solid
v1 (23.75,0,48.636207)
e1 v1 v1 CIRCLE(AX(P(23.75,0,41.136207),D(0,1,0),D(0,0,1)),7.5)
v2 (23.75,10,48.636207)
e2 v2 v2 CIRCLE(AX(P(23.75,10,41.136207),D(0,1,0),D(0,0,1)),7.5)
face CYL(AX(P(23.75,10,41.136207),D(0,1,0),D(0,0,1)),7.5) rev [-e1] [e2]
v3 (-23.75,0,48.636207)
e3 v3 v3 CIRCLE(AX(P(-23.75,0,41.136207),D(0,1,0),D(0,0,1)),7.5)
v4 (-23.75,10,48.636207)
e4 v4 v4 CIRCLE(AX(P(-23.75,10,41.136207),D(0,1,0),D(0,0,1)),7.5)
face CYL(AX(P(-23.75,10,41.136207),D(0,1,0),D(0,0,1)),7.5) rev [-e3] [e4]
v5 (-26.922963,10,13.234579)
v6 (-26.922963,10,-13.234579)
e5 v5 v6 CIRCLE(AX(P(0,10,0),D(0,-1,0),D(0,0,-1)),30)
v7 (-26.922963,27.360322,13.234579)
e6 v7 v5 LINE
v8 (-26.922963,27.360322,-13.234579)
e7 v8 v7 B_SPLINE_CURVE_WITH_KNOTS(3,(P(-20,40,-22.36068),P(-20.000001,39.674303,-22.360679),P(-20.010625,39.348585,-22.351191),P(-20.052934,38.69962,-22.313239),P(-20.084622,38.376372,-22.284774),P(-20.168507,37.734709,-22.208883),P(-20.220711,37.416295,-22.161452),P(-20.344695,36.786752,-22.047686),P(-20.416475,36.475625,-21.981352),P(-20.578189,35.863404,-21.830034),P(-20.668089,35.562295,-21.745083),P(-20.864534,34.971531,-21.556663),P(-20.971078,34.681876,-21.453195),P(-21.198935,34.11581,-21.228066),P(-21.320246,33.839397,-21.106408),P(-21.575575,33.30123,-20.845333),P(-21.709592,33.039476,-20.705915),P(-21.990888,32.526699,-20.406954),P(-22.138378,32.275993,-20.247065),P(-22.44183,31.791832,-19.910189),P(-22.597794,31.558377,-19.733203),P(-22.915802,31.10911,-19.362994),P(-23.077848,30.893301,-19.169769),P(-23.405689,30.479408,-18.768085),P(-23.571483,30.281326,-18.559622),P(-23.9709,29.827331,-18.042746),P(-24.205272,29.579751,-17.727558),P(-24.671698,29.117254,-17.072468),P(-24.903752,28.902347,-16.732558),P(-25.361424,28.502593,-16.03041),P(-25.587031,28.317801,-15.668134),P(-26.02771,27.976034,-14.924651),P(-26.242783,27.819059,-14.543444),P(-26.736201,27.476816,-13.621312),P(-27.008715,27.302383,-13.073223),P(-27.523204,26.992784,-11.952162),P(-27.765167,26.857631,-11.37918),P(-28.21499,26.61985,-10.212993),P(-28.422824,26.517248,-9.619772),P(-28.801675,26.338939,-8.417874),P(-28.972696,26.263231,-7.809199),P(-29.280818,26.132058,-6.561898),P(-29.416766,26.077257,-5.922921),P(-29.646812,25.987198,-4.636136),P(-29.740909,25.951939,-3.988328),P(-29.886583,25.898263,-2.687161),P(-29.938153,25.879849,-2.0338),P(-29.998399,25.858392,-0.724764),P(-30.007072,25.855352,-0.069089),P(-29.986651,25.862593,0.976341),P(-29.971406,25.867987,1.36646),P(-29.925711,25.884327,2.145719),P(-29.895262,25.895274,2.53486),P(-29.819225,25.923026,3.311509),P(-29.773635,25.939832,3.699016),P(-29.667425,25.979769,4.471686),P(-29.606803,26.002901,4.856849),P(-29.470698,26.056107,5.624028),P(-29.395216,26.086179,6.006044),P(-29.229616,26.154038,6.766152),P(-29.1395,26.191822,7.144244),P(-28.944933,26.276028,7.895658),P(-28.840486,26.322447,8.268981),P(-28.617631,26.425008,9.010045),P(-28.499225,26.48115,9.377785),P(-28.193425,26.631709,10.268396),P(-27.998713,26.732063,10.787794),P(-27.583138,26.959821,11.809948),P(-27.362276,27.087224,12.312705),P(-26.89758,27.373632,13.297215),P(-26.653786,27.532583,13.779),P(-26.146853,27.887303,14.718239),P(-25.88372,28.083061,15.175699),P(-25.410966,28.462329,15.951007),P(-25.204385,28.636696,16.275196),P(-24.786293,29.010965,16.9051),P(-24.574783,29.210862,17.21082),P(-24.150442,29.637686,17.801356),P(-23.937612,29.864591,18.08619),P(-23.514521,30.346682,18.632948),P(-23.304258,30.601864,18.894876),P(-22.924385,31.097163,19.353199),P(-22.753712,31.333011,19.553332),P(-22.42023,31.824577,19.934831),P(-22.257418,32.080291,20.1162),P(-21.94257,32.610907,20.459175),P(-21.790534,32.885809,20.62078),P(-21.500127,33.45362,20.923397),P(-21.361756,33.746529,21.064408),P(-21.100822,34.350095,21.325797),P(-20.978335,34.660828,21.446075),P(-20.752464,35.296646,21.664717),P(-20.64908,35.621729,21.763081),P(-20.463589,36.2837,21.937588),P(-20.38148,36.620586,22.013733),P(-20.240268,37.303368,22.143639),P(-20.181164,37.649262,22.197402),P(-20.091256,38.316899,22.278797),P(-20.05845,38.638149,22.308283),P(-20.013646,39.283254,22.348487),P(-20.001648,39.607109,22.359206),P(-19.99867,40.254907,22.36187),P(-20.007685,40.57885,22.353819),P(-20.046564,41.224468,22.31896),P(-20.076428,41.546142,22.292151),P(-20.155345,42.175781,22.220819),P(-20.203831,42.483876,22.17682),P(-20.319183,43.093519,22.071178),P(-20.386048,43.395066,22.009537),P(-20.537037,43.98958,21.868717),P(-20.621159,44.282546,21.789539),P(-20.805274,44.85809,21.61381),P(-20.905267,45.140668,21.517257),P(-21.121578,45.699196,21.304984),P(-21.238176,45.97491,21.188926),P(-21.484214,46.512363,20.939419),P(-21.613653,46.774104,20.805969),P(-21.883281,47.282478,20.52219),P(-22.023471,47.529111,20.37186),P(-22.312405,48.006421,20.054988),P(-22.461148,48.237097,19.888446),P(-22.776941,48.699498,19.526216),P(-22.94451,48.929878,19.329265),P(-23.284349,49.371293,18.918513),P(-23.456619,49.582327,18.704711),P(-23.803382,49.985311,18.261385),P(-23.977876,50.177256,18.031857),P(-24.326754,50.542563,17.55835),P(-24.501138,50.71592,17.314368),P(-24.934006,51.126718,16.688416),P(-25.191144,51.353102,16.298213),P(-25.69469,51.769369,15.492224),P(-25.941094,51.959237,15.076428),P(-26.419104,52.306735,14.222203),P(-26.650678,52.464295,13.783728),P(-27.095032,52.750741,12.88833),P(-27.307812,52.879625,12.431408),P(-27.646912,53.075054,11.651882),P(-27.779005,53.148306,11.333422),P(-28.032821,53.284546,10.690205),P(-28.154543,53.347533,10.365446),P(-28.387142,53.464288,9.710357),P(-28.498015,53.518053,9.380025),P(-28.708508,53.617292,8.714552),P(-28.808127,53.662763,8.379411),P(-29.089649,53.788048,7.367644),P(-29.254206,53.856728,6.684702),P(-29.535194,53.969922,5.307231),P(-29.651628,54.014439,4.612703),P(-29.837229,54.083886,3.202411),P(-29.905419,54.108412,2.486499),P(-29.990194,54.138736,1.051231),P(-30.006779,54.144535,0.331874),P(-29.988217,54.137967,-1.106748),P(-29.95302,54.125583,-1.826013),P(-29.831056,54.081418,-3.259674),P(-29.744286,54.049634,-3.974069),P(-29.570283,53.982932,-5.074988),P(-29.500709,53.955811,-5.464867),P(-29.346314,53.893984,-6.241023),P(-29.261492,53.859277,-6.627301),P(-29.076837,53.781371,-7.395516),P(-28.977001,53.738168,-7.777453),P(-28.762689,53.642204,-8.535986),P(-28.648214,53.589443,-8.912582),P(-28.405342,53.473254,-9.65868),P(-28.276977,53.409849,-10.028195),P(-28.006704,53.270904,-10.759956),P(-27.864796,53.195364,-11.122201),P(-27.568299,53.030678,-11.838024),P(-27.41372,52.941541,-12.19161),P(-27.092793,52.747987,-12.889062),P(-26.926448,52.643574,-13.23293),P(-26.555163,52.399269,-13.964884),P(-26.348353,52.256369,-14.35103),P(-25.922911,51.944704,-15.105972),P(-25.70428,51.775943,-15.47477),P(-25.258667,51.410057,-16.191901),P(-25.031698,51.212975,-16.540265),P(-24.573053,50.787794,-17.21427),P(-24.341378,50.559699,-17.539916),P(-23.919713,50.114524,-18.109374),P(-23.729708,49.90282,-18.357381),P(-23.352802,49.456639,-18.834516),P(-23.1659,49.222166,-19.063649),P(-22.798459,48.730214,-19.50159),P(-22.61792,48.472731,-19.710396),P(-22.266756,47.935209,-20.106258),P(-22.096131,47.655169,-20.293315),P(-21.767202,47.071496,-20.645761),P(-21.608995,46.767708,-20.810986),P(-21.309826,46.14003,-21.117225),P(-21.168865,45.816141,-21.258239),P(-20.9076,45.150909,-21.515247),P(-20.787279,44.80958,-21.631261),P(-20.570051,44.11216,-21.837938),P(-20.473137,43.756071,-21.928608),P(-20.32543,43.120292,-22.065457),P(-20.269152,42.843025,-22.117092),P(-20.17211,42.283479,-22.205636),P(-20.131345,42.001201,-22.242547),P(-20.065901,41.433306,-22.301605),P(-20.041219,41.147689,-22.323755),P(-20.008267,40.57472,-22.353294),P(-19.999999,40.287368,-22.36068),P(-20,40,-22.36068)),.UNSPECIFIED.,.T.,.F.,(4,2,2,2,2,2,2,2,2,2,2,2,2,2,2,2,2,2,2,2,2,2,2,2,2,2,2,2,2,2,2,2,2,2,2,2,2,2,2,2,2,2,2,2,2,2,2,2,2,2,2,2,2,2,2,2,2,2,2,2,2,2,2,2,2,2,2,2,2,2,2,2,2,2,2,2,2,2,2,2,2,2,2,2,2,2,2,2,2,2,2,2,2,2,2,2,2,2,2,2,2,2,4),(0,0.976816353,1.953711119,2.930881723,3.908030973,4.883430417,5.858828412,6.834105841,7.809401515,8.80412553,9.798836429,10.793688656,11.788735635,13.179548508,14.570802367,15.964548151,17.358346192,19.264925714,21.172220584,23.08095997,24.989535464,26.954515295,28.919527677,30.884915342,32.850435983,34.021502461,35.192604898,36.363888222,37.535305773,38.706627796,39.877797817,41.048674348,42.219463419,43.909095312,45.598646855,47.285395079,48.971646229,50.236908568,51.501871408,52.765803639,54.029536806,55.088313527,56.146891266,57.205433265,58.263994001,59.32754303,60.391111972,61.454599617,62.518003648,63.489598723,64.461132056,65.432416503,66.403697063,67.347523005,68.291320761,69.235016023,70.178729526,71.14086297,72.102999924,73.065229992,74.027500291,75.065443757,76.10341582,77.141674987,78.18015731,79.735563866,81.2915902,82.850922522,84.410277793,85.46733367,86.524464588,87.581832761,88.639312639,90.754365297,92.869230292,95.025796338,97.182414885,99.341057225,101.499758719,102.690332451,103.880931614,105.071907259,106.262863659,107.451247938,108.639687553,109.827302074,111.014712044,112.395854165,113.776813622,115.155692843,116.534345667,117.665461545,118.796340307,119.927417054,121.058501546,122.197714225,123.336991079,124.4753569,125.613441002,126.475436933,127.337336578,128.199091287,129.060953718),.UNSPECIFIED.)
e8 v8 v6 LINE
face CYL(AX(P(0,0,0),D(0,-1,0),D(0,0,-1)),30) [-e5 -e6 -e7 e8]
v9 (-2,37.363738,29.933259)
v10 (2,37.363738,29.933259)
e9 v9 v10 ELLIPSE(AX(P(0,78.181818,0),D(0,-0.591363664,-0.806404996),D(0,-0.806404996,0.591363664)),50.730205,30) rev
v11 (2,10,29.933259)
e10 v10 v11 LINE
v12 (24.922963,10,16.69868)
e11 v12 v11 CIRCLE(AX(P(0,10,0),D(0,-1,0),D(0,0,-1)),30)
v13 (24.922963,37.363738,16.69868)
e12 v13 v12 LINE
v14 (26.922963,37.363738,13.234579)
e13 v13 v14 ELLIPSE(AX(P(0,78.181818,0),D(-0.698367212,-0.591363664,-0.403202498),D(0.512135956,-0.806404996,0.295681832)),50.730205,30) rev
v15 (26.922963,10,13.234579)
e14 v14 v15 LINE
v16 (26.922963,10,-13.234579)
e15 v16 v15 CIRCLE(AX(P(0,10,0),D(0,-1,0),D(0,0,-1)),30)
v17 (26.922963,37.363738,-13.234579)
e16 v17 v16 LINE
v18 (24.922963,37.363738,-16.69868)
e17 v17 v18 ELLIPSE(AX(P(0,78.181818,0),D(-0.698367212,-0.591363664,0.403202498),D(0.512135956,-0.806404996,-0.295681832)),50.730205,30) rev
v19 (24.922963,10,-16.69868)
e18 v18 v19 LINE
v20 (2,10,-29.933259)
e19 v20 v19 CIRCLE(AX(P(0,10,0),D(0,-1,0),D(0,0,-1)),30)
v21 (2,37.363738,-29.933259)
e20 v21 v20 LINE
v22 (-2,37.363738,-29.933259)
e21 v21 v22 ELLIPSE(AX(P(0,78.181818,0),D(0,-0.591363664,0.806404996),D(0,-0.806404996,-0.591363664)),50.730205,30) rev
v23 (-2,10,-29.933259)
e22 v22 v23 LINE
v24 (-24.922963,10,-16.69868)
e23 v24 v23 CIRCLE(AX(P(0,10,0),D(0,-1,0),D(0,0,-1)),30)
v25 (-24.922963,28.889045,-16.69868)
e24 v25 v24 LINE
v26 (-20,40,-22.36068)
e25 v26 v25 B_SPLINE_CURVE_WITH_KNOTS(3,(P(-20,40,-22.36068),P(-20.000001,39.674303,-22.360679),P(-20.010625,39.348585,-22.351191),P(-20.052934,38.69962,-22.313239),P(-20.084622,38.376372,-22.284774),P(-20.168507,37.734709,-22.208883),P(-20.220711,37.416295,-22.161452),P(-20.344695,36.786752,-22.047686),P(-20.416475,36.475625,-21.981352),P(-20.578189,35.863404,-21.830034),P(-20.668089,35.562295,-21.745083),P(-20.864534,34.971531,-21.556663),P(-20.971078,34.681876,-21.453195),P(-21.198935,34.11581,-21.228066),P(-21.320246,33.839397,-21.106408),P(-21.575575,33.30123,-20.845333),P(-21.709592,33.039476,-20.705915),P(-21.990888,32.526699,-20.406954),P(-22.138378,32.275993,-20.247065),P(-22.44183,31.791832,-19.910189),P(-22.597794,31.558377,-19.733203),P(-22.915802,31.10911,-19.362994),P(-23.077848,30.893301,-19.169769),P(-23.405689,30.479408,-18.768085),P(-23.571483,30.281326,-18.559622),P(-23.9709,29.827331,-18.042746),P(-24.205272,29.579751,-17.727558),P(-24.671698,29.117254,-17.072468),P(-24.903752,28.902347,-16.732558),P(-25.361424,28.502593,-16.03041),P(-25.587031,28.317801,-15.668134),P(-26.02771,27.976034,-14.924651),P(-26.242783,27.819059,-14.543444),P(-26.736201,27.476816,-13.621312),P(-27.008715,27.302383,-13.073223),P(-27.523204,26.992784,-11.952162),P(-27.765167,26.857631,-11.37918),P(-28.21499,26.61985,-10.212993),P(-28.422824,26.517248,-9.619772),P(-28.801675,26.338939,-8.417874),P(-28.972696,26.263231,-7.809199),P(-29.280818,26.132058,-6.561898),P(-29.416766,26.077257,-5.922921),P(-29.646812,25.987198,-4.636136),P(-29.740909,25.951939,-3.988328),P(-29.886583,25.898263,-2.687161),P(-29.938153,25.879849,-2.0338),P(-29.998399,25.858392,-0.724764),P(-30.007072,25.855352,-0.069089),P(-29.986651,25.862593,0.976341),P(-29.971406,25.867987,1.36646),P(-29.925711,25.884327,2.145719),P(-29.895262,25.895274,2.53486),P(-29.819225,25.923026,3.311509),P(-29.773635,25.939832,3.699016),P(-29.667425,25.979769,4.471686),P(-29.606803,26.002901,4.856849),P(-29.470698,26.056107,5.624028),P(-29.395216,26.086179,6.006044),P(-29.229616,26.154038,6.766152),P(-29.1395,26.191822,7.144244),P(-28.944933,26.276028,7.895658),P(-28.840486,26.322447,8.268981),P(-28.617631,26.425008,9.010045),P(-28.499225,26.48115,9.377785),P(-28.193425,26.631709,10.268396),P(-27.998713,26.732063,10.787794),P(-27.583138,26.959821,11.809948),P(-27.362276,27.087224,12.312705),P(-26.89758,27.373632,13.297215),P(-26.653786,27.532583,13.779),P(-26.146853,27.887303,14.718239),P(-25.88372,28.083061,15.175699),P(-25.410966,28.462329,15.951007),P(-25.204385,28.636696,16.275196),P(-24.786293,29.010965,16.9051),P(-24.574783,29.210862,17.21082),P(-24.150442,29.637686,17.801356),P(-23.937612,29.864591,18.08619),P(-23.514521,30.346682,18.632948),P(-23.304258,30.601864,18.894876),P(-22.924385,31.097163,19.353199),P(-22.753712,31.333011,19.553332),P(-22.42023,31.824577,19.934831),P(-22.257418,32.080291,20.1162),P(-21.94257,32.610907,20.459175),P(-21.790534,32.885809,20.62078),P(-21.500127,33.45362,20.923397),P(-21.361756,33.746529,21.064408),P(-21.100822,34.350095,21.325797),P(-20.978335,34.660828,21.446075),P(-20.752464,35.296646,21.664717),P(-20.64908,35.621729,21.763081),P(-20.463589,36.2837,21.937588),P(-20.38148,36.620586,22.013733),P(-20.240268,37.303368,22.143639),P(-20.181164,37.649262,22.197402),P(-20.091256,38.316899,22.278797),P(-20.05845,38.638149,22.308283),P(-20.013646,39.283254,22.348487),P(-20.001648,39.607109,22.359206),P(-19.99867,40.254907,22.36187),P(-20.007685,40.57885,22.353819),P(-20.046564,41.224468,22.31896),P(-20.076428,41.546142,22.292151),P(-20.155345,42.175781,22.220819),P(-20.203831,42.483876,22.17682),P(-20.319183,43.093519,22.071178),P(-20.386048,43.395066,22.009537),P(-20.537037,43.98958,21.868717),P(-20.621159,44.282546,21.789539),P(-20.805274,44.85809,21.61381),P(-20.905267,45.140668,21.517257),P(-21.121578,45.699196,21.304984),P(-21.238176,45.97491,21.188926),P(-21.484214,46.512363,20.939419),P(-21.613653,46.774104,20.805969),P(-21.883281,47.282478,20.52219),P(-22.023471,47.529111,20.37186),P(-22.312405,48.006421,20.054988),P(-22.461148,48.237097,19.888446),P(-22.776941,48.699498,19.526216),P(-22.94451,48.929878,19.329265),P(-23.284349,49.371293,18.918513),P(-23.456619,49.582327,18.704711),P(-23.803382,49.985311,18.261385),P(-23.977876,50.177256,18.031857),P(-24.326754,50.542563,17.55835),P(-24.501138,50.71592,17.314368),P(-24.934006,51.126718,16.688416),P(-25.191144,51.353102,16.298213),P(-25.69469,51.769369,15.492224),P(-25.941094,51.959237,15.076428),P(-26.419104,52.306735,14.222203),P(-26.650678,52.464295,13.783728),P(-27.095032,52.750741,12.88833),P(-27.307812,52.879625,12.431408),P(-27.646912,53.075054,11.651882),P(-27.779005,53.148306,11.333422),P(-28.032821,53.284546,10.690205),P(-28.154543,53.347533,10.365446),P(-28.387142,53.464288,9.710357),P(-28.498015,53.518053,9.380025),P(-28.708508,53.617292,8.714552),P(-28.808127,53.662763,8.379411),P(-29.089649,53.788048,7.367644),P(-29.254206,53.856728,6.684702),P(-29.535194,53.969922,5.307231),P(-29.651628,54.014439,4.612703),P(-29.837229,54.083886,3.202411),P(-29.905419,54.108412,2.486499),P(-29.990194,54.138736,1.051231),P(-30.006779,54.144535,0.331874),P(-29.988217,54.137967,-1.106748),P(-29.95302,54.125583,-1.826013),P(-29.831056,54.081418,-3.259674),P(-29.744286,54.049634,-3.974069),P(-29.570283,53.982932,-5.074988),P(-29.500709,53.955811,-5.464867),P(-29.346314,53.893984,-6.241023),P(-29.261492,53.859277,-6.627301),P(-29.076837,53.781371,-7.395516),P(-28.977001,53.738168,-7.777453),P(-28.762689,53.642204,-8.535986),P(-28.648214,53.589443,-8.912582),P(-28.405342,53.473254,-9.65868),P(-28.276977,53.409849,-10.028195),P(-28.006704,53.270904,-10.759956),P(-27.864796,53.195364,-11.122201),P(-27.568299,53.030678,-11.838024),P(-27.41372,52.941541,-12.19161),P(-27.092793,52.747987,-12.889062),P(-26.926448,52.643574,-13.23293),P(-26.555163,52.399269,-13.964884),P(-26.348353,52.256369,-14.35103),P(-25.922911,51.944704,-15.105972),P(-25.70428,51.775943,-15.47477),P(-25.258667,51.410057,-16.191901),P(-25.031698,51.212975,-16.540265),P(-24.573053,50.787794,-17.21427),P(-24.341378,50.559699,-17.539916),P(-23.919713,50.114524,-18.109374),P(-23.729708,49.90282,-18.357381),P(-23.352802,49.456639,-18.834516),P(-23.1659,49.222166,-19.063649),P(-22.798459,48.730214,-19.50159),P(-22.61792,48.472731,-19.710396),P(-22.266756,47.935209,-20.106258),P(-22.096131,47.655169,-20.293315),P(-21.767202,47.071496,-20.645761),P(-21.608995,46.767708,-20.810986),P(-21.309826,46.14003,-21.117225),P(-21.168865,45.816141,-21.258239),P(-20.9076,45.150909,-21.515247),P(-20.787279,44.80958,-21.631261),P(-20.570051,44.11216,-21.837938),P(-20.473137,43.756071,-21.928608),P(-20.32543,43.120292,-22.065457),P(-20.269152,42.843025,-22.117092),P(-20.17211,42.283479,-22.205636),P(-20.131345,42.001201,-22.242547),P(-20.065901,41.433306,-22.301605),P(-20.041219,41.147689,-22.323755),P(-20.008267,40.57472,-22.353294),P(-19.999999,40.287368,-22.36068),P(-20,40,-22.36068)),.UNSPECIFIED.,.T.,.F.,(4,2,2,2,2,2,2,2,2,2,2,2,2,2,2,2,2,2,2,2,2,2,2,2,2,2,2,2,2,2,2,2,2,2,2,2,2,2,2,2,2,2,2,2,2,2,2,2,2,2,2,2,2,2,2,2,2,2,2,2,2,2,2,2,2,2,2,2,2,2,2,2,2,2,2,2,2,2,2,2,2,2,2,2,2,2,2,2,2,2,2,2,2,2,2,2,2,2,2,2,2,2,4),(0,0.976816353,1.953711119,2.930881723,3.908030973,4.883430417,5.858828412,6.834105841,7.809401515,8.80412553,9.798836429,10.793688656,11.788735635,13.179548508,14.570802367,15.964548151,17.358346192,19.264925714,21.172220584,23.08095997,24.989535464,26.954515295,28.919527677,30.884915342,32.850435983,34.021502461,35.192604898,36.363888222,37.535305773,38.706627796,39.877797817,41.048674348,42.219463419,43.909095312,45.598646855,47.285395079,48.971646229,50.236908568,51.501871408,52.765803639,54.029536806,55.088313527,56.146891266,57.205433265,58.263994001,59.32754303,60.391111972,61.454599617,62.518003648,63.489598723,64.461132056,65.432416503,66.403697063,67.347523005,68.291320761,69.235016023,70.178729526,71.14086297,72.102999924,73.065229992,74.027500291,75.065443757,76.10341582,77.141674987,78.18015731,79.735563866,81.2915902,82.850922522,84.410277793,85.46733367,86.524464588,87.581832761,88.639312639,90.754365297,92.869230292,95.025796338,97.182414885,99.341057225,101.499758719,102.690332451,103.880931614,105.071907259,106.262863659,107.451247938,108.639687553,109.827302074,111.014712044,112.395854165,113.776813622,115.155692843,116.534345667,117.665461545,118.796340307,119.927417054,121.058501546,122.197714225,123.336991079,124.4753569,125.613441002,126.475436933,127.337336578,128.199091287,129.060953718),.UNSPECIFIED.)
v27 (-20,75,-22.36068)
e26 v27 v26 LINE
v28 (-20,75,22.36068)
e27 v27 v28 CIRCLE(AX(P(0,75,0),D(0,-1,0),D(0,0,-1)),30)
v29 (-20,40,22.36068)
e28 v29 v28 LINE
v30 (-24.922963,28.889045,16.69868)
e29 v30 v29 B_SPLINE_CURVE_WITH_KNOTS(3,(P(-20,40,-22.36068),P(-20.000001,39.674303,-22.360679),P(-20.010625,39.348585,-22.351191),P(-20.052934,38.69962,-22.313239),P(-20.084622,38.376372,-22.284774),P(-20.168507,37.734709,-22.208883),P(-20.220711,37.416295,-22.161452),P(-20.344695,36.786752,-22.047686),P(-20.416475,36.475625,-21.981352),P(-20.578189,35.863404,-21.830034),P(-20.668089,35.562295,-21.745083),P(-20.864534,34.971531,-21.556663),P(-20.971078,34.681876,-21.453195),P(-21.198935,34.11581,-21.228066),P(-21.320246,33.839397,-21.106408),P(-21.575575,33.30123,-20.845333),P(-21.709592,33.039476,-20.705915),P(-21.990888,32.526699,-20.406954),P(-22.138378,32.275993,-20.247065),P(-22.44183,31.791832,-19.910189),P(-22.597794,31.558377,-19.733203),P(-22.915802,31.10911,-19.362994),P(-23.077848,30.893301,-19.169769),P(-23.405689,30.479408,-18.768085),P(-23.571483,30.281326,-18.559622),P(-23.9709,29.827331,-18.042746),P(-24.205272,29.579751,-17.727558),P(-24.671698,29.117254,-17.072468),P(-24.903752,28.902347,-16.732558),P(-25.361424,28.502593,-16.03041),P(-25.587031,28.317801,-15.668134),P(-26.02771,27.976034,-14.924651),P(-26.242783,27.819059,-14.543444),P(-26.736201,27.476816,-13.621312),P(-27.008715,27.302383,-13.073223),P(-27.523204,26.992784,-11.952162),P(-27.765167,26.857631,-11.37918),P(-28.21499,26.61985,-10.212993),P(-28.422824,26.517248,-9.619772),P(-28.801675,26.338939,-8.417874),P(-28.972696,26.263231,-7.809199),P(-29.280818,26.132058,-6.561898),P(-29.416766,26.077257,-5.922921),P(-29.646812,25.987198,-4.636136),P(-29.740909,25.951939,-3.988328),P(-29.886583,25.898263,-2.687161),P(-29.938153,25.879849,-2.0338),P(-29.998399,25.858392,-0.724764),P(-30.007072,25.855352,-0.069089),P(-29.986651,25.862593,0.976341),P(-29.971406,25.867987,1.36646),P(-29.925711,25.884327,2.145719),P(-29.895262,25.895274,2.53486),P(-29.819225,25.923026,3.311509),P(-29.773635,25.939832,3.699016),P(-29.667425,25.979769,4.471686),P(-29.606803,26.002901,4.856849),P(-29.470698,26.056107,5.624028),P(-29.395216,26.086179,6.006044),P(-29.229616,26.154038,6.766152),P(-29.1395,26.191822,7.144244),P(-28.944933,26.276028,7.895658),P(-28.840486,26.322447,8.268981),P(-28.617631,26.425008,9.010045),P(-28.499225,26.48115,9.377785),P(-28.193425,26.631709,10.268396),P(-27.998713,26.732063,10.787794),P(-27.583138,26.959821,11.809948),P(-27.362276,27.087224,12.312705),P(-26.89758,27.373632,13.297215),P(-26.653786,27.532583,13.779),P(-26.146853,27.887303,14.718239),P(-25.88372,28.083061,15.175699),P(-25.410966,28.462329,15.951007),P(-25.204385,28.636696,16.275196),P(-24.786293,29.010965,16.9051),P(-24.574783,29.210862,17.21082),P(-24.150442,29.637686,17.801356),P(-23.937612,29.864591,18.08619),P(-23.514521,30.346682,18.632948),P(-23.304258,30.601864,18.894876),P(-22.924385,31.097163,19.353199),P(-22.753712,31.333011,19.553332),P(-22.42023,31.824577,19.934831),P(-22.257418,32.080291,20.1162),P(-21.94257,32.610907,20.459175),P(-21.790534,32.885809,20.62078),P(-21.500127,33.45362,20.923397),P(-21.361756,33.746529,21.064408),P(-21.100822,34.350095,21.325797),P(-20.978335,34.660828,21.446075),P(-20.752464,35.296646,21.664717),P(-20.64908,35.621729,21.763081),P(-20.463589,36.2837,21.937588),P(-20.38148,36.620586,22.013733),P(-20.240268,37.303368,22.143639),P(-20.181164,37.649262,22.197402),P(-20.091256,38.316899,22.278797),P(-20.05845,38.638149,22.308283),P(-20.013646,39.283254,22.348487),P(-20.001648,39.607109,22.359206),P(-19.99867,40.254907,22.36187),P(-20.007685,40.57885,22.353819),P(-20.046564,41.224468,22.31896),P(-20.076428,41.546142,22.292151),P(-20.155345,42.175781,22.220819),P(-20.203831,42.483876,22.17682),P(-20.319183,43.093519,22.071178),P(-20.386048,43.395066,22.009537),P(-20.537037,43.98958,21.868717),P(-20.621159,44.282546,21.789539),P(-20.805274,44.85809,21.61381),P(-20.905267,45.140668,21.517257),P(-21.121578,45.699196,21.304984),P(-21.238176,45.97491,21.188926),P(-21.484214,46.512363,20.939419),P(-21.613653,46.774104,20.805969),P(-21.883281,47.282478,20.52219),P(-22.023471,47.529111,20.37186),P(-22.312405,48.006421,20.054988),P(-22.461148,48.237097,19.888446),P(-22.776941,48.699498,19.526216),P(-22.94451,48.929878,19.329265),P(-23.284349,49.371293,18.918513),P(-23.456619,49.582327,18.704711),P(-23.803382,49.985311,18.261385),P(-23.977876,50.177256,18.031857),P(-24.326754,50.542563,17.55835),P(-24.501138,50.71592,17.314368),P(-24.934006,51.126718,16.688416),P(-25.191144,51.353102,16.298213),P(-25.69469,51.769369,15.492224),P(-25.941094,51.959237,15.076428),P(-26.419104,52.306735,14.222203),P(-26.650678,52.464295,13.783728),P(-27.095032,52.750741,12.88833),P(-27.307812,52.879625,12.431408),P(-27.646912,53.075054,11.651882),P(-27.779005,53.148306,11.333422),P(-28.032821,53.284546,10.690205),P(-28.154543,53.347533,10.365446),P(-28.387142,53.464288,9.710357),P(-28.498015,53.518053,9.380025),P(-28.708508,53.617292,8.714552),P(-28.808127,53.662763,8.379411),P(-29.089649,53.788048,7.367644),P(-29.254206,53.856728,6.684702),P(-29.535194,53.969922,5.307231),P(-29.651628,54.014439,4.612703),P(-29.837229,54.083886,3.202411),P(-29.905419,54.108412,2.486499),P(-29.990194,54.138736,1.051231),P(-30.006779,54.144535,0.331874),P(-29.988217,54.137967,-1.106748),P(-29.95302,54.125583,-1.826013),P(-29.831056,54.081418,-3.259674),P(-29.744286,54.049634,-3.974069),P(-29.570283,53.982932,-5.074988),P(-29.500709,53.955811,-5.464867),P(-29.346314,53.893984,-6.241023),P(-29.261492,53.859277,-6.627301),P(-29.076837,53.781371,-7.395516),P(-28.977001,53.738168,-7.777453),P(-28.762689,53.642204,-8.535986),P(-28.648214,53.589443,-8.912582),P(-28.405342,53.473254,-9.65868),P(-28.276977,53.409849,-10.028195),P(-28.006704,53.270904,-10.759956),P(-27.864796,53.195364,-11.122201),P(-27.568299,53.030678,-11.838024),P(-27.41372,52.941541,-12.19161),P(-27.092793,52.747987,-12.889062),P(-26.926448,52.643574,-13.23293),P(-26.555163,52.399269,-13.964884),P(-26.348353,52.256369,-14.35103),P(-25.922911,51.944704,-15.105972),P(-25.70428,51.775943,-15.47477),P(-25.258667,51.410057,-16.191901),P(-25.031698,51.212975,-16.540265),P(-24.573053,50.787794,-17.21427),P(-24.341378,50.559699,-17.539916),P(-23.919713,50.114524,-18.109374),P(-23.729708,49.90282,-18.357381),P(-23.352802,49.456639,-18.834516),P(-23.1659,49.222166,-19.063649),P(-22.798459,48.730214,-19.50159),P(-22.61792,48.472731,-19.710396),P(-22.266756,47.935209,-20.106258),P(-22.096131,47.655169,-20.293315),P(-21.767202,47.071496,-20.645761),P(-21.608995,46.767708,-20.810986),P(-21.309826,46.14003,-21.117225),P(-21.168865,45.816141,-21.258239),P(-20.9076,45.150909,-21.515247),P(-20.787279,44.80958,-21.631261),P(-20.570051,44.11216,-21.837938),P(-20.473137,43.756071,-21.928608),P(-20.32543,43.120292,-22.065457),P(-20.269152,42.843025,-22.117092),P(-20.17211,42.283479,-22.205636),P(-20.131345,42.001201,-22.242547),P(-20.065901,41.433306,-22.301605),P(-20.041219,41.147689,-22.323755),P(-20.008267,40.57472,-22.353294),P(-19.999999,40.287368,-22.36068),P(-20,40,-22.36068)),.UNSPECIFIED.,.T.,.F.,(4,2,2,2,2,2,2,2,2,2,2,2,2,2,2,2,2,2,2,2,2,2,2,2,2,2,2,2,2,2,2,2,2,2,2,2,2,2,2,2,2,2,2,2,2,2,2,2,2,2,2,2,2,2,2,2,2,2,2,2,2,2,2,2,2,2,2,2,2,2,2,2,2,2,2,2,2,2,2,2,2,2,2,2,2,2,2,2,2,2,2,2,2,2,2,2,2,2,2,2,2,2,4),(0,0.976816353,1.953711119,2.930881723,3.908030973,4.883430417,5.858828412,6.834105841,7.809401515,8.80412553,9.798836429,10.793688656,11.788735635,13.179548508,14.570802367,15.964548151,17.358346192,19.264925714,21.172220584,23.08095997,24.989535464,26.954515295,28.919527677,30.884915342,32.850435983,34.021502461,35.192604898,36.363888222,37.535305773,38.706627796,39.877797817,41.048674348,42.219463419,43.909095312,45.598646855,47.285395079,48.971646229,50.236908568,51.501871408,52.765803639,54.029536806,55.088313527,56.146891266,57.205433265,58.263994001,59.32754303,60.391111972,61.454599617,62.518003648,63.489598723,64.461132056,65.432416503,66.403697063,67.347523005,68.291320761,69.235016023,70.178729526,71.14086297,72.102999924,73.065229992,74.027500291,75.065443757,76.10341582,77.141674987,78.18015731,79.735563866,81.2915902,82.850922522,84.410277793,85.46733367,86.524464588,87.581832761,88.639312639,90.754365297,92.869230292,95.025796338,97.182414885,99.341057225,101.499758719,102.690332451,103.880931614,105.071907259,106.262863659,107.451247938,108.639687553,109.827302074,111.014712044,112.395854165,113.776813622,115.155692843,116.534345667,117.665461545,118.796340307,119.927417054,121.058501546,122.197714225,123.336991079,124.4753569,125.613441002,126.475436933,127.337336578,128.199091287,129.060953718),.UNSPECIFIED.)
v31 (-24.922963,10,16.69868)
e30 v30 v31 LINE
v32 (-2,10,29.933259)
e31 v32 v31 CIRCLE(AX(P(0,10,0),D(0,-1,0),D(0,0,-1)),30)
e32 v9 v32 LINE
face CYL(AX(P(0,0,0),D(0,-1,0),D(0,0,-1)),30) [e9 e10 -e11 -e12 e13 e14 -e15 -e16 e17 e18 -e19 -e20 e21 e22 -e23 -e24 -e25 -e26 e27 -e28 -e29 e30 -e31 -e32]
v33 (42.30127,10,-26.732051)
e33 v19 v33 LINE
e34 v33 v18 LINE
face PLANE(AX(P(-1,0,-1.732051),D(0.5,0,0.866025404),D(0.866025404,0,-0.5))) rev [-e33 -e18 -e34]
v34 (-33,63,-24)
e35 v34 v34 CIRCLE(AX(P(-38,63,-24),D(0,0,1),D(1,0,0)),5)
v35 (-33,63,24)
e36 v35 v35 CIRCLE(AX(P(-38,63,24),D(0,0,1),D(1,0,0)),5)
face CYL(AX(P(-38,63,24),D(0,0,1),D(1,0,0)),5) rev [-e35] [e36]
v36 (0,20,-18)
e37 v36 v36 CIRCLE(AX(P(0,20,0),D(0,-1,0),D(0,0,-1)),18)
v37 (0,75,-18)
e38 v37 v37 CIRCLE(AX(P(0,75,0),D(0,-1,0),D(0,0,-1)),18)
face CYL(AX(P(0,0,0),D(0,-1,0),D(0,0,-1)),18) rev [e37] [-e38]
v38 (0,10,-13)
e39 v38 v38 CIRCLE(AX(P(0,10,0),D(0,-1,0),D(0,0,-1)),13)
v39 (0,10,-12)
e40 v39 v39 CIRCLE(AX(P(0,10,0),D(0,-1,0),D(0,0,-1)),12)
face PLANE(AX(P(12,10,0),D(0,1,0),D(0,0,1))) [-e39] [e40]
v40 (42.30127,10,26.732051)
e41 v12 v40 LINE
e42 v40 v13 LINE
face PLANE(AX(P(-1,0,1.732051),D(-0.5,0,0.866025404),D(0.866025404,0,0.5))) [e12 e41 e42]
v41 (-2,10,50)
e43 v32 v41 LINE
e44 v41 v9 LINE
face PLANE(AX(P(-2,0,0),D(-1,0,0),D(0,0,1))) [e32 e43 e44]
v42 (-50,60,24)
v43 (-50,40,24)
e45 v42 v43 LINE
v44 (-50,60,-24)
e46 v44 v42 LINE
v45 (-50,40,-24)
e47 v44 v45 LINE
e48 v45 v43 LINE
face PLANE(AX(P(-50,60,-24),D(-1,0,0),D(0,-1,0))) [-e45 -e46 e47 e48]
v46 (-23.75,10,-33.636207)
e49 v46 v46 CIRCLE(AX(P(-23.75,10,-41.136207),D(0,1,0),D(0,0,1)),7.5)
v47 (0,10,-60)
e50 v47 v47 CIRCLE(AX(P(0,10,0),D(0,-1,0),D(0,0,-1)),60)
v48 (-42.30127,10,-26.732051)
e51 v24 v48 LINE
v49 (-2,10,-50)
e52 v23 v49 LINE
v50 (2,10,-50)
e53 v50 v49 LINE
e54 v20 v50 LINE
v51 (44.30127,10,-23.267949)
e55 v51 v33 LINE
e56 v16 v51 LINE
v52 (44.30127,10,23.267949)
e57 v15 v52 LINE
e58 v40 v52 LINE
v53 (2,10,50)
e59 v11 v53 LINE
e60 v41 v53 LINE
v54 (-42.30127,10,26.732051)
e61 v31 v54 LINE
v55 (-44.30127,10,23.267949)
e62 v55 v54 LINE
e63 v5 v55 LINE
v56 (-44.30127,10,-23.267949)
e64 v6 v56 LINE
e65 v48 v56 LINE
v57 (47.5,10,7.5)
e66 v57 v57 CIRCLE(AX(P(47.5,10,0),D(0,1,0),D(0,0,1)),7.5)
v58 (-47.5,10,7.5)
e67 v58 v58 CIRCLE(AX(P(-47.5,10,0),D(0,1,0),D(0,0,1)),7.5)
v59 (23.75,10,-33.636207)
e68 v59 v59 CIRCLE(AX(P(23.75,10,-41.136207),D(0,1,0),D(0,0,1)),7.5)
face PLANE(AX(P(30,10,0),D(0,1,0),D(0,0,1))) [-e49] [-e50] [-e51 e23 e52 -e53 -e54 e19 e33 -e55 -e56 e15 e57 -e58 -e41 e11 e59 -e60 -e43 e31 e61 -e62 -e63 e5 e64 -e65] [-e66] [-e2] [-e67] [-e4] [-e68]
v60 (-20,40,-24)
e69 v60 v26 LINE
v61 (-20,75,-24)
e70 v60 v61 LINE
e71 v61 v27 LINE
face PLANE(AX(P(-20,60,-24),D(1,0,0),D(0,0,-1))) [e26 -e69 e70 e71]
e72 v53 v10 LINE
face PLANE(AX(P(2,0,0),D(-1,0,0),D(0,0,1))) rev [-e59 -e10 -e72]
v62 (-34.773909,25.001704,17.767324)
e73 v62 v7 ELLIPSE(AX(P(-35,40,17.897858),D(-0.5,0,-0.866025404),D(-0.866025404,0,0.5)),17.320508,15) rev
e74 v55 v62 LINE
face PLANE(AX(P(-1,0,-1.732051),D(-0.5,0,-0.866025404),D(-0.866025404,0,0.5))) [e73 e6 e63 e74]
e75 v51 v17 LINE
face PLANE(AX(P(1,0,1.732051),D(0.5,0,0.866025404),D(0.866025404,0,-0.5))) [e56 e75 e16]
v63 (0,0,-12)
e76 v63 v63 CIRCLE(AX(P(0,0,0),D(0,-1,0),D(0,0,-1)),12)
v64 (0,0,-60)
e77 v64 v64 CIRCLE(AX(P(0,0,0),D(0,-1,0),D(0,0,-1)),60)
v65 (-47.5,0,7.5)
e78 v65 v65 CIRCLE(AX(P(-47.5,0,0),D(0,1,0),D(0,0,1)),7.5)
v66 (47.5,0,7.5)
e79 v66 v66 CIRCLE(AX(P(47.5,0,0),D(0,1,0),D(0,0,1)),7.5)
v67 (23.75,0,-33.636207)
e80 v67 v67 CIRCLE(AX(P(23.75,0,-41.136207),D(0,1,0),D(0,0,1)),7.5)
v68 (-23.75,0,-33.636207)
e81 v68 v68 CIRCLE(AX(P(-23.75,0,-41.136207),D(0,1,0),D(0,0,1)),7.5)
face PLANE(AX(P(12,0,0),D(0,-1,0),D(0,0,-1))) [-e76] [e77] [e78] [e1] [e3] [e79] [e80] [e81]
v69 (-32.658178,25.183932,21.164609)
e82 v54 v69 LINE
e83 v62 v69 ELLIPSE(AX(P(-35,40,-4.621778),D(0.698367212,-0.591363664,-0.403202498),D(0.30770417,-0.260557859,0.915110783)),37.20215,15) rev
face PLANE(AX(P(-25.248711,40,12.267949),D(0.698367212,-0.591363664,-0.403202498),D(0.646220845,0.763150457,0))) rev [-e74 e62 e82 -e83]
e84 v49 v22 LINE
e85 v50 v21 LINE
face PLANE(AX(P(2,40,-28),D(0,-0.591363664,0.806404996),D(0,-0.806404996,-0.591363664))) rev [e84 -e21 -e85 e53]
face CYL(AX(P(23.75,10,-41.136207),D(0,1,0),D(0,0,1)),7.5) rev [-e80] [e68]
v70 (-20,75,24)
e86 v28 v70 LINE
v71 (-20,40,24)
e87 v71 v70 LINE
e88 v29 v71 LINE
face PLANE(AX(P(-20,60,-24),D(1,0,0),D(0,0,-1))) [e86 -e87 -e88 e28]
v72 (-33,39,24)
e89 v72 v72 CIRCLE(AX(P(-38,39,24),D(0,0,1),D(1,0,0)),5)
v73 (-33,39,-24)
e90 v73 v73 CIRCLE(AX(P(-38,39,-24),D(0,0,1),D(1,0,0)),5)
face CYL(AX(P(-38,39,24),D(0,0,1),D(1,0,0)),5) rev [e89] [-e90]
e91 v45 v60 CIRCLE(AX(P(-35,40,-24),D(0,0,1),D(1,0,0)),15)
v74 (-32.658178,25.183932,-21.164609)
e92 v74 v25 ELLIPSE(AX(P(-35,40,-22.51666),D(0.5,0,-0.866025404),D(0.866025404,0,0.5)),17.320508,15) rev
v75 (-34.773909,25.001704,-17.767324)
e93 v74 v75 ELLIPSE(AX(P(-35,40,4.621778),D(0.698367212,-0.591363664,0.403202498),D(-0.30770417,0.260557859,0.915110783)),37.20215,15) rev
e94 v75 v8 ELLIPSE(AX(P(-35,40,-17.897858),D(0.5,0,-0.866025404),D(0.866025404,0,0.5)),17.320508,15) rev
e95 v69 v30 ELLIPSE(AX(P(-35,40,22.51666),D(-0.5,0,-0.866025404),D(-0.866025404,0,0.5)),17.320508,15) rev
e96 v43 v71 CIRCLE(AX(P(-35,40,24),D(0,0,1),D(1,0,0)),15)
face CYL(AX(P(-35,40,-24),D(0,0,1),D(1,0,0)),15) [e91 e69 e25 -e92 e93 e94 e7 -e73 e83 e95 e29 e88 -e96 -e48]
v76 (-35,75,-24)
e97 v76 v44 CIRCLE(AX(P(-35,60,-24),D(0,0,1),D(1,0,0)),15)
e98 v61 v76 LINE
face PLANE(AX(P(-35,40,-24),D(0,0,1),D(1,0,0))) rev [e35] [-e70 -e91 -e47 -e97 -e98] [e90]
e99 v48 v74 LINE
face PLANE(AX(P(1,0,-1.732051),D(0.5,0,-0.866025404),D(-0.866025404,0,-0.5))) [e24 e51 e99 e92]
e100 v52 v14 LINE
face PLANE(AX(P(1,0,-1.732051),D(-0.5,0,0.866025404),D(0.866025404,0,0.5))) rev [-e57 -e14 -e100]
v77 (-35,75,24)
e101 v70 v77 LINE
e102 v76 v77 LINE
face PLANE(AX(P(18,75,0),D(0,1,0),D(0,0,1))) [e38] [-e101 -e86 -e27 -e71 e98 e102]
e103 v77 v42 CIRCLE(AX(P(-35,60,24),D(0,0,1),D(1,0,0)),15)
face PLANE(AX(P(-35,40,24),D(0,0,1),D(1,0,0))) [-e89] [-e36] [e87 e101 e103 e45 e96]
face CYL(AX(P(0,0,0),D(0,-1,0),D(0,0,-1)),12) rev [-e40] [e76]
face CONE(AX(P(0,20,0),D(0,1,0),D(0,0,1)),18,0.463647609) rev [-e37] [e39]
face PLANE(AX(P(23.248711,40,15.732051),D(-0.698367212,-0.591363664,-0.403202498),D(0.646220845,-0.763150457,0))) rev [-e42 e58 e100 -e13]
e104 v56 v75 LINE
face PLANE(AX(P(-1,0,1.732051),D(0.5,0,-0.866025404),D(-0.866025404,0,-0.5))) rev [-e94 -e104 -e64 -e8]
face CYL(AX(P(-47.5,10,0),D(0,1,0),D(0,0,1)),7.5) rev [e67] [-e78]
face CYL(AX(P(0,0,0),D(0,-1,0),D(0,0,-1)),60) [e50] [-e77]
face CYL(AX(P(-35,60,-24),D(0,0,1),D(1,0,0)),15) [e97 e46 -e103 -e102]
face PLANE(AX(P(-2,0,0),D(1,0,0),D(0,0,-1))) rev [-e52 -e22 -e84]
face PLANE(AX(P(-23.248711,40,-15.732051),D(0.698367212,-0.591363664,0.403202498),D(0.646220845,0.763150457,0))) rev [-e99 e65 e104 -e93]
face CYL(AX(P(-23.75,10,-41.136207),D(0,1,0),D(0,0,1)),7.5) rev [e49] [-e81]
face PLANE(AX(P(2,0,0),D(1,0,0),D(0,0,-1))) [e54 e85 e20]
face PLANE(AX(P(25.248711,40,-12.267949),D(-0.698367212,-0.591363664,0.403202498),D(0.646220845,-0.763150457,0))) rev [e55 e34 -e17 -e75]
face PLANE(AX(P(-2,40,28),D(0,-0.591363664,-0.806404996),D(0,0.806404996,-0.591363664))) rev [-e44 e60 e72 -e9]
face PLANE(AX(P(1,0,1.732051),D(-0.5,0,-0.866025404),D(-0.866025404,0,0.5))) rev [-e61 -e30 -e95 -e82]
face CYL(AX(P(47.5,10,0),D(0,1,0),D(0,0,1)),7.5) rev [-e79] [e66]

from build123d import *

# Parameters (mm, degrees)
BOSS_EXTRUDE1_DEPTH   = 48
HOLE1_D               = 10
BOSS_EXTRUDE2_DEPTH   = 2
CIRPATTERN1_COUNT     = 6
HOLE2_D               = 15
CIRPATTERN2_OUTLINE_R = 7.5
CIRPATTERN2_DEPTH     = 10


# Read off the part's stored shape, not the designer's step: CirPattern2
with BuildPart() as part:
    # Sketch1 → Revolve1 (revolve)
    with BuildSketch(Plane.XY, mode=Mode.PRIVATE) as revolve1_sk:
        Polygon((12, 0), (12, 10), (13, 10), (18, 20), (18, 75), (30, 75), (30, 10), (60, 10), (60, 0), align=None)
    revolve(revolve1_sk.sketch.rotate(Axis((0, 0, 0), (0, 1, 0)), 90), axis=Axis((0, 0, 0), (0, 1, 0)))

    # Sketch2 → Boss-Extrude1 (add)
    with BuildSketch(Plane.XY.offset(24)):
        with BuildLine():
            Line((-20, 60), (-20, 40))
            ThreePointArc((-20, 40), (-35, 25), (-50, 40))
            Line((-50, 40), (-50, 60))
            ThreePointArc((-50, 60), (-45.606601718, 70.606601718), (-35, 75))
            Line((-35, 75), (-20, 75))
            Line((-20, 75), (-20, 60))
        make_face()
    extrude(amount=-BOSS_EXTRUDE1_DEPTH)

    # Hole1 (through all)
    with Locations(Plane.XY.offset(24)):
        with Locations((-38, 63), (-38, 39)):
            Hole(HOLE1_D / 2)

    # Sketch5 → Boss-Extrude2 (add, symmetric)
    with BuildSketch(Plane(origin=(0, 0, 0), x_dir=(0, 0, -1), z_dir=(1, 0, 0))):
        Polygon((28, 40), (50, 10), (28, 10), align=None)
    boss_extrude2 = extrude(amount=BOSS_EXTRUDE2_DEPTH, both=True)

    # CirPattern1: Boss-Extrude2 ×6 about axis
    cirpattern1_axis = Axis((0, 0, 0), (0, 1, 0))
    for i in range(1, CIRPATTERN1_COUNT):
        add(boss_extrude2.rotate(cirpattern1_axis, i * 360 / CIRPATTERN1_COUNT))

    # Hole2 (through all)
    with Locations(Plane(origin=(0, 10, 0), x_dir=(1, 0, 0), z_dir=(0, 1, 0))):
        with Locations((47.5, 0)):
            Hole(HOLE2_D / 2)

    # CirPattern2 outline → CirPattern2 (cut)
    with BuildSketch(Plane(origin=(0, 0, 0), x_dir=(1, 0, 0), z_dir=(0, 1, 0))):
        with Locations((23.75, 41.13620668)):
            Circle(CIRPATTERN2_OUTLINE_R)
        with Locations((-23.75, 41.13620668)):
            Circle(CIRPATTERN2_OUTLINE_R)
        with Locations((-47.5, 0)):
            Circle(CIRPATTERN2_OUTLINE_R)
        with Locations((-23.75, -41.13620668)):
            Circle(CIRPATTERN2_OUTLINE_R)
        with Locations((23.75, -41.13620668)):
            Circle(CIRPATTERN2_OUTLINE_R)
    extrude(amount=CIRPATTERN2_DEPTH, mode=Mode.SUBTRACT)


solid = part.part
